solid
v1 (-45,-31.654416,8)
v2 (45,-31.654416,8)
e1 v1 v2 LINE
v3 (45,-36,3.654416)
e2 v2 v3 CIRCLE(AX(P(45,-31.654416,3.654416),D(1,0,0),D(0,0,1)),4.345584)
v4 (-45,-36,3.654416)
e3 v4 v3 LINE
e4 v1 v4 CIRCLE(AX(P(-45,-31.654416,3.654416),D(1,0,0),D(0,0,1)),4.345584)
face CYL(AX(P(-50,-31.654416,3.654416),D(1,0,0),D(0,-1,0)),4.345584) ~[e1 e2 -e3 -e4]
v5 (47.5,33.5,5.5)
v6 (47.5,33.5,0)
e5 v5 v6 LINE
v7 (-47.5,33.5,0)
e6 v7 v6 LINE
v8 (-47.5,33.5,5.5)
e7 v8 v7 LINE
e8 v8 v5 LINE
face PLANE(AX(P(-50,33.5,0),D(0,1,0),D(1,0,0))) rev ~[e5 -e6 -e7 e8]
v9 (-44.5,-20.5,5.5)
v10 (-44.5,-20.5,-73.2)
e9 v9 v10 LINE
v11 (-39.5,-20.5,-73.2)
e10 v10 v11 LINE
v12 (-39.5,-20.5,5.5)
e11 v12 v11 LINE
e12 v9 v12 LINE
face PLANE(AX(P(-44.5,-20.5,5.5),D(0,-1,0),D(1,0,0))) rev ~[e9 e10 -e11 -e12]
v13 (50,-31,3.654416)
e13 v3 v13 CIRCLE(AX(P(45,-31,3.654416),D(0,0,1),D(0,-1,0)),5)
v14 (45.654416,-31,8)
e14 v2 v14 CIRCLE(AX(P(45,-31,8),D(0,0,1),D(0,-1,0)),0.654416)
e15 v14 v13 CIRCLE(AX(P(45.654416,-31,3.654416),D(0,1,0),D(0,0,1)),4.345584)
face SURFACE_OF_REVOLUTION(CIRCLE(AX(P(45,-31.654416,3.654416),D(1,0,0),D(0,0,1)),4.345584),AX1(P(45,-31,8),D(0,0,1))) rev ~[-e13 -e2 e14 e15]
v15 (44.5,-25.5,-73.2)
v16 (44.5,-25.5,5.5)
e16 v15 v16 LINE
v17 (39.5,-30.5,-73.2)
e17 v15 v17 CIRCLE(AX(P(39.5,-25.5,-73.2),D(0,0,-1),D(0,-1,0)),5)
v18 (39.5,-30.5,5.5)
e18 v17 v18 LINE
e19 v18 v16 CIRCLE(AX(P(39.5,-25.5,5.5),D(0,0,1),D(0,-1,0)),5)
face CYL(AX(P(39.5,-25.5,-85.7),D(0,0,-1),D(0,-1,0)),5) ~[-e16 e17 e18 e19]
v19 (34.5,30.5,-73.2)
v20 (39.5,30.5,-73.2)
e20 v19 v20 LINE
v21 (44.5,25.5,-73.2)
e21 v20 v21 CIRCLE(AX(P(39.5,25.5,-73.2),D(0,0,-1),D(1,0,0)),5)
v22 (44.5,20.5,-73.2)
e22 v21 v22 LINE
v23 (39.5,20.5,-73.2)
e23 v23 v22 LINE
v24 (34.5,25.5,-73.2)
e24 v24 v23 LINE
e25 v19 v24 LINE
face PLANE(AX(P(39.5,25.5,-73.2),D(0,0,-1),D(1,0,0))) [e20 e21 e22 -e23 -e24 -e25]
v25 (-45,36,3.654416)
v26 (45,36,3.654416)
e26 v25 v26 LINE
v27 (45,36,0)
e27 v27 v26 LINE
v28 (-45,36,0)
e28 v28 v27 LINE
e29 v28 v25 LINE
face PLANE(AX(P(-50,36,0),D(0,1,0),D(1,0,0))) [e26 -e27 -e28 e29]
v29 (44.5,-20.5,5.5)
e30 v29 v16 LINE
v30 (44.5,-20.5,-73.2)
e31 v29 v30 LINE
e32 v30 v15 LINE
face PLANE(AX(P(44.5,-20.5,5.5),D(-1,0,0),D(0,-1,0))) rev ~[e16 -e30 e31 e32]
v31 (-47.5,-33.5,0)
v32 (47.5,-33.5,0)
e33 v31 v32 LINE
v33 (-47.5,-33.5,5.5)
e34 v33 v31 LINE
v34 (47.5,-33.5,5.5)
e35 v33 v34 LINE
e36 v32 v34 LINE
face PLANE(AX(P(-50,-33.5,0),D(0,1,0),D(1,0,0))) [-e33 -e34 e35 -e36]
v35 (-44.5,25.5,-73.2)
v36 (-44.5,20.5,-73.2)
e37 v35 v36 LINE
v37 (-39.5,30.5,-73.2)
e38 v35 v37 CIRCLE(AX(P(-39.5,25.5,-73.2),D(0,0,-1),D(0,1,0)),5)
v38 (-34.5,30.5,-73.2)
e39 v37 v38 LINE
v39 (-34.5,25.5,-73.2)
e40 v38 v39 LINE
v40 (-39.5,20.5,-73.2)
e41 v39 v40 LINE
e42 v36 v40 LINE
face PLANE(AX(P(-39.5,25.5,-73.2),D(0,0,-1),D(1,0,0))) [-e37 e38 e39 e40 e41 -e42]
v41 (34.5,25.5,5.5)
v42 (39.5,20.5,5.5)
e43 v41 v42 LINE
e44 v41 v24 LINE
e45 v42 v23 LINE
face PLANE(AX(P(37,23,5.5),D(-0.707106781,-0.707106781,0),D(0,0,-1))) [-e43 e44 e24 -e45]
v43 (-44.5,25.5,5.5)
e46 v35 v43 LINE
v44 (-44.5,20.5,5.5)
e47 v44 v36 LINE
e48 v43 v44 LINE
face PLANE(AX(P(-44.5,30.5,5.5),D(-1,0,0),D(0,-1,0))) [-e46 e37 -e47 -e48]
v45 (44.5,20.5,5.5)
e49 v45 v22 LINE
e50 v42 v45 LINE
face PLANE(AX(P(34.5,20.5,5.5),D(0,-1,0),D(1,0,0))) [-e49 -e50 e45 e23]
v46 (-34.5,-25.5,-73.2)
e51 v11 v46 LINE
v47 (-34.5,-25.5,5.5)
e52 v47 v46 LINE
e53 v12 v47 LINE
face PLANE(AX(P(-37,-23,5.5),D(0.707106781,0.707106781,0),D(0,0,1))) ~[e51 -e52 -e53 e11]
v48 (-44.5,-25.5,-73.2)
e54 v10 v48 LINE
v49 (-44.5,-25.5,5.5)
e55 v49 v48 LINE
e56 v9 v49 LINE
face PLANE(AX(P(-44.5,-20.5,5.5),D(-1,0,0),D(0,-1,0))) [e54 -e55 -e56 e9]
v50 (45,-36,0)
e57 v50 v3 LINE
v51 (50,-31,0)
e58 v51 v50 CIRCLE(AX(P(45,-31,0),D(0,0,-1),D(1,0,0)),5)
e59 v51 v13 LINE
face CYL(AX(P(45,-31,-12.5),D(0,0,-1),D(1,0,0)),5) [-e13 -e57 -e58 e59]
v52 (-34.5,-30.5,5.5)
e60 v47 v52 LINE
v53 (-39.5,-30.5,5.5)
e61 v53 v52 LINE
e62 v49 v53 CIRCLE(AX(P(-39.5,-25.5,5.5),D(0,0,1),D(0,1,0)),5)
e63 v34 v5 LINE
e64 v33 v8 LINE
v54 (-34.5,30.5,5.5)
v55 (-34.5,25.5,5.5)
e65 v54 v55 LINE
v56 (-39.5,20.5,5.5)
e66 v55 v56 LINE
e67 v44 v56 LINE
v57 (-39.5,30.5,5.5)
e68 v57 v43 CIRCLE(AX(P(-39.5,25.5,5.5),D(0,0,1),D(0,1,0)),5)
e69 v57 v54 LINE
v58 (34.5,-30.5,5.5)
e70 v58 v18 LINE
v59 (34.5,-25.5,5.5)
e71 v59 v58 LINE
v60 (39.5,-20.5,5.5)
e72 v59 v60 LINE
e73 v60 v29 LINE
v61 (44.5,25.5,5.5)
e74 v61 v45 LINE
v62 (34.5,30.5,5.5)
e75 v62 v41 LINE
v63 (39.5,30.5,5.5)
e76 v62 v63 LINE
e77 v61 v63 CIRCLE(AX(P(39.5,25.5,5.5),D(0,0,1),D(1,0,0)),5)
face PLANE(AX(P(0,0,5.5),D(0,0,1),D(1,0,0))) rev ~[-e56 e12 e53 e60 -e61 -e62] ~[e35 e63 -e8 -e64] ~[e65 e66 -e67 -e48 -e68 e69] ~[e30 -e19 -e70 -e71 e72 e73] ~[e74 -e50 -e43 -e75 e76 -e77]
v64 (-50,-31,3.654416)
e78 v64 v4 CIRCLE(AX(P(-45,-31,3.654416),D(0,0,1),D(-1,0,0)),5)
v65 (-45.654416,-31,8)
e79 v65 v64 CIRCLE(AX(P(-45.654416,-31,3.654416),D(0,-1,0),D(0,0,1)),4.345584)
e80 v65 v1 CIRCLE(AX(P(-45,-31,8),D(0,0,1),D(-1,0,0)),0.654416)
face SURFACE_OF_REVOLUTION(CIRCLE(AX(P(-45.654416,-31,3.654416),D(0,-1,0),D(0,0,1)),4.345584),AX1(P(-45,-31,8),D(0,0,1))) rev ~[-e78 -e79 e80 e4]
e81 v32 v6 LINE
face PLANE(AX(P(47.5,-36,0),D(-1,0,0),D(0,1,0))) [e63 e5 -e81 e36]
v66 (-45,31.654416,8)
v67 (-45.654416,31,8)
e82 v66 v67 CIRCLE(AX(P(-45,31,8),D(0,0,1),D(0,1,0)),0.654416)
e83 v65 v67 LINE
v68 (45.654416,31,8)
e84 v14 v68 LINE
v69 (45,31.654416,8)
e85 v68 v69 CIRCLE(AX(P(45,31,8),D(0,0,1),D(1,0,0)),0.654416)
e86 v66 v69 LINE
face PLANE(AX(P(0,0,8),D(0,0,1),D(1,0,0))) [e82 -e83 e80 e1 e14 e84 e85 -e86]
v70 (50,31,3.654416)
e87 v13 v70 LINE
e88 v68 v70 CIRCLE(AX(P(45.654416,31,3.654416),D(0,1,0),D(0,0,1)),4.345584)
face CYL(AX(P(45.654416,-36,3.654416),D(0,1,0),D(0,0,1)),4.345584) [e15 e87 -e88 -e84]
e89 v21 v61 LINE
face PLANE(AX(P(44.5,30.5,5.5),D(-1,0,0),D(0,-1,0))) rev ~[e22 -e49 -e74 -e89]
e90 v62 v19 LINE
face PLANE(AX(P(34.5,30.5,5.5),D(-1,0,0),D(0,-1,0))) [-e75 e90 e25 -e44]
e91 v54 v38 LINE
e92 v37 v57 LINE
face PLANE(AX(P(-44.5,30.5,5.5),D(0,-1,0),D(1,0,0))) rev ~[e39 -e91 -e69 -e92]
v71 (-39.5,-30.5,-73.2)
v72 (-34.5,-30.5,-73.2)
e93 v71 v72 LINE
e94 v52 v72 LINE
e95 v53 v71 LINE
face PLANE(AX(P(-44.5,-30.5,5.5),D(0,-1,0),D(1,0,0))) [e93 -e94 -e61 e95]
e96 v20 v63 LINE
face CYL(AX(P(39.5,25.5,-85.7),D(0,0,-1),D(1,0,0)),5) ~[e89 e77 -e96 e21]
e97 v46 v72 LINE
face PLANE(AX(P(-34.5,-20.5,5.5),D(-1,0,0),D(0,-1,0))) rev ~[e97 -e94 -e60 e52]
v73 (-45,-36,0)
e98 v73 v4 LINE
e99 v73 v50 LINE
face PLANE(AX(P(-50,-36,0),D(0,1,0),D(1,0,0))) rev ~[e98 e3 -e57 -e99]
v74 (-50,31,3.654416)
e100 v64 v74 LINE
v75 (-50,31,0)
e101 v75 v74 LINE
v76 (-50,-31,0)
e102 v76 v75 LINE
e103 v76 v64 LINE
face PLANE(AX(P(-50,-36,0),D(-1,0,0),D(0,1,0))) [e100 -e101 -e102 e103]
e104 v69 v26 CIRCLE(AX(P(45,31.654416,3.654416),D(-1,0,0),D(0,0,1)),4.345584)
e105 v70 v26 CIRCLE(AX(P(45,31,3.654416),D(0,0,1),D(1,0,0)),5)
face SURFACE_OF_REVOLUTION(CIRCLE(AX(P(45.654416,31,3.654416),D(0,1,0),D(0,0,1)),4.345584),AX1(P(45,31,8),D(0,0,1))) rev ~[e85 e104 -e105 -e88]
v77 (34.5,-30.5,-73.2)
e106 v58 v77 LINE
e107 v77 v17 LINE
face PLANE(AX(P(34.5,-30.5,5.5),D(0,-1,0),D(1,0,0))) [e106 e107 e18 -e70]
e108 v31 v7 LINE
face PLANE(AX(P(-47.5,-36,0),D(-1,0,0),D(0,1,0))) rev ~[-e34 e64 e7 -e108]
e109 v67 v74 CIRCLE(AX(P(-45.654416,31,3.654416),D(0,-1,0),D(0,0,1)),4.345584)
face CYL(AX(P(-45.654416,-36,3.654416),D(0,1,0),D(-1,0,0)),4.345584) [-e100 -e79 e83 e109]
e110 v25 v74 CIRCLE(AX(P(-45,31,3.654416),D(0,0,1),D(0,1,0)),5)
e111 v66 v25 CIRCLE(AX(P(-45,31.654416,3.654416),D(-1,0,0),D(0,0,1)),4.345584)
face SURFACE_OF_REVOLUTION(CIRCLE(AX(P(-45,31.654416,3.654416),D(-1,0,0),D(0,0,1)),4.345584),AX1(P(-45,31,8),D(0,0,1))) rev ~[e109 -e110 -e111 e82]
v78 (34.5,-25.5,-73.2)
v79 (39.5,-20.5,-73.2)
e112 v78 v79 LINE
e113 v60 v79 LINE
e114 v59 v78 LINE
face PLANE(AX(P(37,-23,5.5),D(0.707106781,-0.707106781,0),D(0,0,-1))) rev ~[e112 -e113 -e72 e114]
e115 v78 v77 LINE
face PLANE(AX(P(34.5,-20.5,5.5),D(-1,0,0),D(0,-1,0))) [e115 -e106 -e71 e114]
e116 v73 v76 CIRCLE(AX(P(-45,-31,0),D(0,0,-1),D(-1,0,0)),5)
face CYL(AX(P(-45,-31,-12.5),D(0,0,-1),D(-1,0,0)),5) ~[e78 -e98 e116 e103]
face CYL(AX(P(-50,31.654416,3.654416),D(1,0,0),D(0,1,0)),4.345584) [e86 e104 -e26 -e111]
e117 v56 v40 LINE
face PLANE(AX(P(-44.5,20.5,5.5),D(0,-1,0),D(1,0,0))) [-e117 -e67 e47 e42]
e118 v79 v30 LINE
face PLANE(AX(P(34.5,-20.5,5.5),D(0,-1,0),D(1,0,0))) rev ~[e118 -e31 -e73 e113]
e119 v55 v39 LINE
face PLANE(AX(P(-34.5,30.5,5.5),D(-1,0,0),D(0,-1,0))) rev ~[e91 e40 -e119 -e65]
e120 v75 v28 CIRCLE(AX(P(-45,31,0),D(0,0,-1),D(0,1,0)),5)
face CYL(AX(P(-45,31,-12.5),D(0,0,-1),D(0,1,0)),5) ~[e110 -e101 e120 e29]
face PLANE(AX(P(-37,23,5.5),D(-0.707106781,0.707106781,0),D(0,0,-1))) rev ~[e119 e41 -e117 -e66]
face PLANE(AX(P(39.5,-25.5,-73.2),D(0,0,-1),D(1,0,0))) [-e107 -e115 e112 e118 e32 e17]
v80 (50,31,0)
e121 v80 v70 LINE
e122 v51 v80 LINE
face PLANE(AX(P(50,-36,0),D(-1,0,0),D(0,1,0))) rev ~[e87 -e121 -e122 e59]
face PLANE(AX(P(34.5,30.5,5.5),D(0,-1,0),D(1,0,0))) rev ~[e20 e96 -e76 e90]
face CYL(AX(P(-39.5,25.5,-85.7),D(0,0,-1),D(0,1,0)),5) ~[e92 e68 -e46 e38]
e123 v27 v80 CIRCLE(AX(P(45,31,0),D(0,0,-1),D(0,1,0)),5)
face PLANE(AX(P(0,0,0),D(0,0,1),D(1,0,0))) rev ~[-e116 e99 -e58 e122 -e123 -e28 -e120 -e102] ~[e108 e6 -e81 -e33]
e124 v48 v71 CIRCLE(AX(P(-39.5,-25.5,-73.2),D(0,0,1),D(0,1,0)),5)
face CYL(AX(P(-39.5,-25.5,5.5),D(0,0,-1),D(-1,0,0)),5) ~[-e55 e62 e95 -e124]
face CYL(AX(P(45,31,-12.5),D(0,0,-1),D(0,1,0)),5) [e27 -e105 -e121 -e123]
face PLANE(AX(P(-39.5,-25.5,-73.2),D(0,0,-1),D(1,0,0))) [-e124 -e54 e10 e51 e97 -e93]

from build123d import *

# Parameters (mm, degrees)
F0_W         = 100
F0_H         = 72
F1_DEPTH     = 8
F2_T         = -2.5
F3_W         = 10
F3_H         = 10
F4_DEPTH     = 78.7
F5_R         = 4.3455844123
F6_R         = 5
F7_T1_DEPTH  = 20.5
F7_T3_DEPTH  = 91.2
F7_T6_ANGLE  = 90
F7_T8_ANGLE  = 90
F7_T10_ANGLE = 90
F8_SIZE      = 5
F9_T1_DEPTH  = 20.5
F9_T4_ANGLE  = 90


# Not quite as in the source:
# - a fillet or chamfer that OpenCascade refuses, or shapes differently, is made with other operations: its cross-section is extruded or revolved along the edge and cut away or added


with BuildPart() as f1:
    # F0 (on Top) → F1 (new body)
    with BuildSketch(Plane.XY):
        Rectangle(F0_W, F0_H)
    extrude(amount=F1_DEPTH)

    # F2
    f2_openings = [f1.faces().sort_by_distance(p)[0] for p in [
        (0, 0, 0),
    ]]
    offset(amount=F2_T, openings=f2_openings)

    # F3 (on face) → F4 (join)
    with BuildSketch(Plane(origin=(0, 0, 5.5), x_dir=(1, 0, 0), z_dir=(0, 0, -1))):
        with Locations((-39.5, -25.5)):
            Rectangle(F3_W, F3_H)
        with Locations((39.5, -25.5)):
            Rectangle(F3_W, F3_H)
        with Locations((39.5, 25.5)):
            Rectangle(F3_W, F3_H)
        with Locations((-39.5, 25.5)):
            Rectangle(F3_W, F3_H)
    extrude(amount=F4_DEPTH)

    # F5
    f5_edges = [f1.edges().sort_by_distance(p)[0] for p in [
        (-50, 0, 8),
        (0, -36, 8),
        (50, 0, 8),
        (0, 36, 8),
    ]]
    fillet(f5_edges, radius=F5_R)

    # F6
    f6_edges = [f1.edges().sort_by_distance(p)[0] for p in [
        (-44.5, -30.5, -33.85),
    ]]
    fillet(f6_edges, radius=F6_R)

    # F7: fillet of radius 5 on 6 edges, made by hand

    # F7_s2 → F7_t1 (cut)
    with BuildSketch(Plane.XY.offset(-12.5)):
        with BuildLine():
            ThreePointArc((-50, -31), (-48.5355339059, -34.5355339059), (-45, -36))
            Line((-45, -36), (-50, -36))
            Line((-50, -36), (-50, -31))
        make_face()
        with BuildLine():
            ThreePointArc((-45, 36), (-48.5355339059, 34.5355339059), (-50, 31))
            Line((-50, 31), (-50, 36))
            Line((-50, 36), (-45, 36))
        make_face()
        with BuildLine():
            ThreePointArc((45, 36), (48.5355339059, 34.5355339059), (50, 31))
            Line((50, 31), (50, 36))
            Line((50, 36), (45, 36))
        make_face()
    extrude(amount=F7_T1_DEPTH, mode=Mode.SUBTRACT)

    # F7_s4 → F7_t3 (cut)
    with BuildSketch(Plane.XY.offset(-85.7)):
        with BuildLine():
            ThreePointArc((39.5, -30.5), (43.0355339059, -29.0355339059), (44.5, -25.5))
            Line((44.5, -25.5), (44.5, -30.5))
            Line((44.5, -30.5), (39.5, -30.5))
        make_face()
        with BuildLine():
            ThreePointArc((44.5, 25.5), (43.0355339059, 29.0355339059), (39.5, 30.5))
            Line((39.5, 30.5), (44.5, 30.5))
            Line((44.5, 30.5), (44.5, 25.5))
        make_face()
        with BuildLine():
            ThreePointArc((-39.5, 30.5), (-43.0355339059, 29.0355339059), (-44.5, 25.5))
            Line((-44.5, 25.5), (-44.5, 30.5))
            Line((-44.5, 30.5), (-39.5, 30.5))
        make_face()
    extrude(amount=F7_T3_DEPTH, mode=Mode.SUBTRACT)

    # F7_s5 → F7_t6 (revolve, cut)
    with BuildSketch(Plane.XZ.offset(-31)):
        with BuildLine():
            ThreePointArc((45.6544155877, 8), (48.7272077939, 6.7272077939), (50, 3.6544155877))
            Line((50, 3.6544155877), (50, 8))
            Line((50, 8), (45.6544155877, 8))
        make_face()
    revolve(axis=Axis((45, 31, 8), (0, 0, 1)), revolution_arc=F7_T6_ANGLE, mode=Mode.SUBTRACT)

    # F7_s7 → F7_t8 (revolve, cut)
    with BuildSketch(Plane.YZ.offset(-45)):
        with BuildLine():
            ThreePointArc((31.6544155877, 8), (34.7272077939, 6.7272077939), (36, 3.6544155877))
            Line((36, 3.6544155877), (36, 8))
            Line((36, 8), (31.6544155877, 8))
        make_face()
    revolve(axis=Axis((-45, 31, 8), (0, 0, 1)), revolution_arc=F7_T8_ANGLE, mode=Mode.SUBTRACT)

    # F7_s9 → F7_t10 (revolve, cut)
    with BuildSketch(Plane.XZ.offset(31)):
        with BuildLine():
            ThreePointArc((-45.6544155877, 8), (-48.7272077939, 6.7272077939), (-50, 3.6544155877))
            Line((-50, 3.6544155877), (-50, 8))
            Line((-50, 8), (-45.6544155877, 8))
        make_face()
    revolve(axis=Axis((-45, -31, 8), (0, 0, 1)), revolution_arc=F7_T10_ANGLE, mode=Mode.SUBTRACT)

    # F8
    f8_edges = [f1.edges().sort_by_distance(p)[0] for p in [
        (-34.5, -20.5, -33.85),
        (-34.5, 20.5, -33.85),
        (34.5, 20.5, -33.85),
        (34.5, -20.5, -33.85),
    ]]
    chamfer(f8_edges, length=F8_SIZE)

    # F9: fillet of radius 5 on 1 edges, made by hand

    # F9_s2 → F9_t1 (cut)
    with BuildSketch(Plane.XY.offset(-12.5)):
        with BuildLine():
            ThreePointArc((50, -31), (48.5355339059, -34.5355339059), (45, -36))
            Line((45, -36), (50, -36))
            Line((50, -36), (50, -31))
        make_face()
    extrude(amount=F9_T1_DEPTH, mode=Mode.SUBTRACT)

    # F9_s3 → F9_t4 (revolve, cut)
    with BuildSketch(Plane.YZ.offset(45)):
        with BuildLine():
            ThreePointArc((-31.6544155877, 8), (-34.7272077939, 6.7272077939), (-36, 3.6544155877))
            Line((-36, 3.6544155877), (-36, 8))
            Line((-36, 8), (-31.6544155877, 8))
        make_face()
    revolve(axis=Axis((45, -31, 8), (0, 0, 1)), revolution_arc=F9_T4_ANGLE, mode=Mode.SUBTRACT)


solid = f1.part
